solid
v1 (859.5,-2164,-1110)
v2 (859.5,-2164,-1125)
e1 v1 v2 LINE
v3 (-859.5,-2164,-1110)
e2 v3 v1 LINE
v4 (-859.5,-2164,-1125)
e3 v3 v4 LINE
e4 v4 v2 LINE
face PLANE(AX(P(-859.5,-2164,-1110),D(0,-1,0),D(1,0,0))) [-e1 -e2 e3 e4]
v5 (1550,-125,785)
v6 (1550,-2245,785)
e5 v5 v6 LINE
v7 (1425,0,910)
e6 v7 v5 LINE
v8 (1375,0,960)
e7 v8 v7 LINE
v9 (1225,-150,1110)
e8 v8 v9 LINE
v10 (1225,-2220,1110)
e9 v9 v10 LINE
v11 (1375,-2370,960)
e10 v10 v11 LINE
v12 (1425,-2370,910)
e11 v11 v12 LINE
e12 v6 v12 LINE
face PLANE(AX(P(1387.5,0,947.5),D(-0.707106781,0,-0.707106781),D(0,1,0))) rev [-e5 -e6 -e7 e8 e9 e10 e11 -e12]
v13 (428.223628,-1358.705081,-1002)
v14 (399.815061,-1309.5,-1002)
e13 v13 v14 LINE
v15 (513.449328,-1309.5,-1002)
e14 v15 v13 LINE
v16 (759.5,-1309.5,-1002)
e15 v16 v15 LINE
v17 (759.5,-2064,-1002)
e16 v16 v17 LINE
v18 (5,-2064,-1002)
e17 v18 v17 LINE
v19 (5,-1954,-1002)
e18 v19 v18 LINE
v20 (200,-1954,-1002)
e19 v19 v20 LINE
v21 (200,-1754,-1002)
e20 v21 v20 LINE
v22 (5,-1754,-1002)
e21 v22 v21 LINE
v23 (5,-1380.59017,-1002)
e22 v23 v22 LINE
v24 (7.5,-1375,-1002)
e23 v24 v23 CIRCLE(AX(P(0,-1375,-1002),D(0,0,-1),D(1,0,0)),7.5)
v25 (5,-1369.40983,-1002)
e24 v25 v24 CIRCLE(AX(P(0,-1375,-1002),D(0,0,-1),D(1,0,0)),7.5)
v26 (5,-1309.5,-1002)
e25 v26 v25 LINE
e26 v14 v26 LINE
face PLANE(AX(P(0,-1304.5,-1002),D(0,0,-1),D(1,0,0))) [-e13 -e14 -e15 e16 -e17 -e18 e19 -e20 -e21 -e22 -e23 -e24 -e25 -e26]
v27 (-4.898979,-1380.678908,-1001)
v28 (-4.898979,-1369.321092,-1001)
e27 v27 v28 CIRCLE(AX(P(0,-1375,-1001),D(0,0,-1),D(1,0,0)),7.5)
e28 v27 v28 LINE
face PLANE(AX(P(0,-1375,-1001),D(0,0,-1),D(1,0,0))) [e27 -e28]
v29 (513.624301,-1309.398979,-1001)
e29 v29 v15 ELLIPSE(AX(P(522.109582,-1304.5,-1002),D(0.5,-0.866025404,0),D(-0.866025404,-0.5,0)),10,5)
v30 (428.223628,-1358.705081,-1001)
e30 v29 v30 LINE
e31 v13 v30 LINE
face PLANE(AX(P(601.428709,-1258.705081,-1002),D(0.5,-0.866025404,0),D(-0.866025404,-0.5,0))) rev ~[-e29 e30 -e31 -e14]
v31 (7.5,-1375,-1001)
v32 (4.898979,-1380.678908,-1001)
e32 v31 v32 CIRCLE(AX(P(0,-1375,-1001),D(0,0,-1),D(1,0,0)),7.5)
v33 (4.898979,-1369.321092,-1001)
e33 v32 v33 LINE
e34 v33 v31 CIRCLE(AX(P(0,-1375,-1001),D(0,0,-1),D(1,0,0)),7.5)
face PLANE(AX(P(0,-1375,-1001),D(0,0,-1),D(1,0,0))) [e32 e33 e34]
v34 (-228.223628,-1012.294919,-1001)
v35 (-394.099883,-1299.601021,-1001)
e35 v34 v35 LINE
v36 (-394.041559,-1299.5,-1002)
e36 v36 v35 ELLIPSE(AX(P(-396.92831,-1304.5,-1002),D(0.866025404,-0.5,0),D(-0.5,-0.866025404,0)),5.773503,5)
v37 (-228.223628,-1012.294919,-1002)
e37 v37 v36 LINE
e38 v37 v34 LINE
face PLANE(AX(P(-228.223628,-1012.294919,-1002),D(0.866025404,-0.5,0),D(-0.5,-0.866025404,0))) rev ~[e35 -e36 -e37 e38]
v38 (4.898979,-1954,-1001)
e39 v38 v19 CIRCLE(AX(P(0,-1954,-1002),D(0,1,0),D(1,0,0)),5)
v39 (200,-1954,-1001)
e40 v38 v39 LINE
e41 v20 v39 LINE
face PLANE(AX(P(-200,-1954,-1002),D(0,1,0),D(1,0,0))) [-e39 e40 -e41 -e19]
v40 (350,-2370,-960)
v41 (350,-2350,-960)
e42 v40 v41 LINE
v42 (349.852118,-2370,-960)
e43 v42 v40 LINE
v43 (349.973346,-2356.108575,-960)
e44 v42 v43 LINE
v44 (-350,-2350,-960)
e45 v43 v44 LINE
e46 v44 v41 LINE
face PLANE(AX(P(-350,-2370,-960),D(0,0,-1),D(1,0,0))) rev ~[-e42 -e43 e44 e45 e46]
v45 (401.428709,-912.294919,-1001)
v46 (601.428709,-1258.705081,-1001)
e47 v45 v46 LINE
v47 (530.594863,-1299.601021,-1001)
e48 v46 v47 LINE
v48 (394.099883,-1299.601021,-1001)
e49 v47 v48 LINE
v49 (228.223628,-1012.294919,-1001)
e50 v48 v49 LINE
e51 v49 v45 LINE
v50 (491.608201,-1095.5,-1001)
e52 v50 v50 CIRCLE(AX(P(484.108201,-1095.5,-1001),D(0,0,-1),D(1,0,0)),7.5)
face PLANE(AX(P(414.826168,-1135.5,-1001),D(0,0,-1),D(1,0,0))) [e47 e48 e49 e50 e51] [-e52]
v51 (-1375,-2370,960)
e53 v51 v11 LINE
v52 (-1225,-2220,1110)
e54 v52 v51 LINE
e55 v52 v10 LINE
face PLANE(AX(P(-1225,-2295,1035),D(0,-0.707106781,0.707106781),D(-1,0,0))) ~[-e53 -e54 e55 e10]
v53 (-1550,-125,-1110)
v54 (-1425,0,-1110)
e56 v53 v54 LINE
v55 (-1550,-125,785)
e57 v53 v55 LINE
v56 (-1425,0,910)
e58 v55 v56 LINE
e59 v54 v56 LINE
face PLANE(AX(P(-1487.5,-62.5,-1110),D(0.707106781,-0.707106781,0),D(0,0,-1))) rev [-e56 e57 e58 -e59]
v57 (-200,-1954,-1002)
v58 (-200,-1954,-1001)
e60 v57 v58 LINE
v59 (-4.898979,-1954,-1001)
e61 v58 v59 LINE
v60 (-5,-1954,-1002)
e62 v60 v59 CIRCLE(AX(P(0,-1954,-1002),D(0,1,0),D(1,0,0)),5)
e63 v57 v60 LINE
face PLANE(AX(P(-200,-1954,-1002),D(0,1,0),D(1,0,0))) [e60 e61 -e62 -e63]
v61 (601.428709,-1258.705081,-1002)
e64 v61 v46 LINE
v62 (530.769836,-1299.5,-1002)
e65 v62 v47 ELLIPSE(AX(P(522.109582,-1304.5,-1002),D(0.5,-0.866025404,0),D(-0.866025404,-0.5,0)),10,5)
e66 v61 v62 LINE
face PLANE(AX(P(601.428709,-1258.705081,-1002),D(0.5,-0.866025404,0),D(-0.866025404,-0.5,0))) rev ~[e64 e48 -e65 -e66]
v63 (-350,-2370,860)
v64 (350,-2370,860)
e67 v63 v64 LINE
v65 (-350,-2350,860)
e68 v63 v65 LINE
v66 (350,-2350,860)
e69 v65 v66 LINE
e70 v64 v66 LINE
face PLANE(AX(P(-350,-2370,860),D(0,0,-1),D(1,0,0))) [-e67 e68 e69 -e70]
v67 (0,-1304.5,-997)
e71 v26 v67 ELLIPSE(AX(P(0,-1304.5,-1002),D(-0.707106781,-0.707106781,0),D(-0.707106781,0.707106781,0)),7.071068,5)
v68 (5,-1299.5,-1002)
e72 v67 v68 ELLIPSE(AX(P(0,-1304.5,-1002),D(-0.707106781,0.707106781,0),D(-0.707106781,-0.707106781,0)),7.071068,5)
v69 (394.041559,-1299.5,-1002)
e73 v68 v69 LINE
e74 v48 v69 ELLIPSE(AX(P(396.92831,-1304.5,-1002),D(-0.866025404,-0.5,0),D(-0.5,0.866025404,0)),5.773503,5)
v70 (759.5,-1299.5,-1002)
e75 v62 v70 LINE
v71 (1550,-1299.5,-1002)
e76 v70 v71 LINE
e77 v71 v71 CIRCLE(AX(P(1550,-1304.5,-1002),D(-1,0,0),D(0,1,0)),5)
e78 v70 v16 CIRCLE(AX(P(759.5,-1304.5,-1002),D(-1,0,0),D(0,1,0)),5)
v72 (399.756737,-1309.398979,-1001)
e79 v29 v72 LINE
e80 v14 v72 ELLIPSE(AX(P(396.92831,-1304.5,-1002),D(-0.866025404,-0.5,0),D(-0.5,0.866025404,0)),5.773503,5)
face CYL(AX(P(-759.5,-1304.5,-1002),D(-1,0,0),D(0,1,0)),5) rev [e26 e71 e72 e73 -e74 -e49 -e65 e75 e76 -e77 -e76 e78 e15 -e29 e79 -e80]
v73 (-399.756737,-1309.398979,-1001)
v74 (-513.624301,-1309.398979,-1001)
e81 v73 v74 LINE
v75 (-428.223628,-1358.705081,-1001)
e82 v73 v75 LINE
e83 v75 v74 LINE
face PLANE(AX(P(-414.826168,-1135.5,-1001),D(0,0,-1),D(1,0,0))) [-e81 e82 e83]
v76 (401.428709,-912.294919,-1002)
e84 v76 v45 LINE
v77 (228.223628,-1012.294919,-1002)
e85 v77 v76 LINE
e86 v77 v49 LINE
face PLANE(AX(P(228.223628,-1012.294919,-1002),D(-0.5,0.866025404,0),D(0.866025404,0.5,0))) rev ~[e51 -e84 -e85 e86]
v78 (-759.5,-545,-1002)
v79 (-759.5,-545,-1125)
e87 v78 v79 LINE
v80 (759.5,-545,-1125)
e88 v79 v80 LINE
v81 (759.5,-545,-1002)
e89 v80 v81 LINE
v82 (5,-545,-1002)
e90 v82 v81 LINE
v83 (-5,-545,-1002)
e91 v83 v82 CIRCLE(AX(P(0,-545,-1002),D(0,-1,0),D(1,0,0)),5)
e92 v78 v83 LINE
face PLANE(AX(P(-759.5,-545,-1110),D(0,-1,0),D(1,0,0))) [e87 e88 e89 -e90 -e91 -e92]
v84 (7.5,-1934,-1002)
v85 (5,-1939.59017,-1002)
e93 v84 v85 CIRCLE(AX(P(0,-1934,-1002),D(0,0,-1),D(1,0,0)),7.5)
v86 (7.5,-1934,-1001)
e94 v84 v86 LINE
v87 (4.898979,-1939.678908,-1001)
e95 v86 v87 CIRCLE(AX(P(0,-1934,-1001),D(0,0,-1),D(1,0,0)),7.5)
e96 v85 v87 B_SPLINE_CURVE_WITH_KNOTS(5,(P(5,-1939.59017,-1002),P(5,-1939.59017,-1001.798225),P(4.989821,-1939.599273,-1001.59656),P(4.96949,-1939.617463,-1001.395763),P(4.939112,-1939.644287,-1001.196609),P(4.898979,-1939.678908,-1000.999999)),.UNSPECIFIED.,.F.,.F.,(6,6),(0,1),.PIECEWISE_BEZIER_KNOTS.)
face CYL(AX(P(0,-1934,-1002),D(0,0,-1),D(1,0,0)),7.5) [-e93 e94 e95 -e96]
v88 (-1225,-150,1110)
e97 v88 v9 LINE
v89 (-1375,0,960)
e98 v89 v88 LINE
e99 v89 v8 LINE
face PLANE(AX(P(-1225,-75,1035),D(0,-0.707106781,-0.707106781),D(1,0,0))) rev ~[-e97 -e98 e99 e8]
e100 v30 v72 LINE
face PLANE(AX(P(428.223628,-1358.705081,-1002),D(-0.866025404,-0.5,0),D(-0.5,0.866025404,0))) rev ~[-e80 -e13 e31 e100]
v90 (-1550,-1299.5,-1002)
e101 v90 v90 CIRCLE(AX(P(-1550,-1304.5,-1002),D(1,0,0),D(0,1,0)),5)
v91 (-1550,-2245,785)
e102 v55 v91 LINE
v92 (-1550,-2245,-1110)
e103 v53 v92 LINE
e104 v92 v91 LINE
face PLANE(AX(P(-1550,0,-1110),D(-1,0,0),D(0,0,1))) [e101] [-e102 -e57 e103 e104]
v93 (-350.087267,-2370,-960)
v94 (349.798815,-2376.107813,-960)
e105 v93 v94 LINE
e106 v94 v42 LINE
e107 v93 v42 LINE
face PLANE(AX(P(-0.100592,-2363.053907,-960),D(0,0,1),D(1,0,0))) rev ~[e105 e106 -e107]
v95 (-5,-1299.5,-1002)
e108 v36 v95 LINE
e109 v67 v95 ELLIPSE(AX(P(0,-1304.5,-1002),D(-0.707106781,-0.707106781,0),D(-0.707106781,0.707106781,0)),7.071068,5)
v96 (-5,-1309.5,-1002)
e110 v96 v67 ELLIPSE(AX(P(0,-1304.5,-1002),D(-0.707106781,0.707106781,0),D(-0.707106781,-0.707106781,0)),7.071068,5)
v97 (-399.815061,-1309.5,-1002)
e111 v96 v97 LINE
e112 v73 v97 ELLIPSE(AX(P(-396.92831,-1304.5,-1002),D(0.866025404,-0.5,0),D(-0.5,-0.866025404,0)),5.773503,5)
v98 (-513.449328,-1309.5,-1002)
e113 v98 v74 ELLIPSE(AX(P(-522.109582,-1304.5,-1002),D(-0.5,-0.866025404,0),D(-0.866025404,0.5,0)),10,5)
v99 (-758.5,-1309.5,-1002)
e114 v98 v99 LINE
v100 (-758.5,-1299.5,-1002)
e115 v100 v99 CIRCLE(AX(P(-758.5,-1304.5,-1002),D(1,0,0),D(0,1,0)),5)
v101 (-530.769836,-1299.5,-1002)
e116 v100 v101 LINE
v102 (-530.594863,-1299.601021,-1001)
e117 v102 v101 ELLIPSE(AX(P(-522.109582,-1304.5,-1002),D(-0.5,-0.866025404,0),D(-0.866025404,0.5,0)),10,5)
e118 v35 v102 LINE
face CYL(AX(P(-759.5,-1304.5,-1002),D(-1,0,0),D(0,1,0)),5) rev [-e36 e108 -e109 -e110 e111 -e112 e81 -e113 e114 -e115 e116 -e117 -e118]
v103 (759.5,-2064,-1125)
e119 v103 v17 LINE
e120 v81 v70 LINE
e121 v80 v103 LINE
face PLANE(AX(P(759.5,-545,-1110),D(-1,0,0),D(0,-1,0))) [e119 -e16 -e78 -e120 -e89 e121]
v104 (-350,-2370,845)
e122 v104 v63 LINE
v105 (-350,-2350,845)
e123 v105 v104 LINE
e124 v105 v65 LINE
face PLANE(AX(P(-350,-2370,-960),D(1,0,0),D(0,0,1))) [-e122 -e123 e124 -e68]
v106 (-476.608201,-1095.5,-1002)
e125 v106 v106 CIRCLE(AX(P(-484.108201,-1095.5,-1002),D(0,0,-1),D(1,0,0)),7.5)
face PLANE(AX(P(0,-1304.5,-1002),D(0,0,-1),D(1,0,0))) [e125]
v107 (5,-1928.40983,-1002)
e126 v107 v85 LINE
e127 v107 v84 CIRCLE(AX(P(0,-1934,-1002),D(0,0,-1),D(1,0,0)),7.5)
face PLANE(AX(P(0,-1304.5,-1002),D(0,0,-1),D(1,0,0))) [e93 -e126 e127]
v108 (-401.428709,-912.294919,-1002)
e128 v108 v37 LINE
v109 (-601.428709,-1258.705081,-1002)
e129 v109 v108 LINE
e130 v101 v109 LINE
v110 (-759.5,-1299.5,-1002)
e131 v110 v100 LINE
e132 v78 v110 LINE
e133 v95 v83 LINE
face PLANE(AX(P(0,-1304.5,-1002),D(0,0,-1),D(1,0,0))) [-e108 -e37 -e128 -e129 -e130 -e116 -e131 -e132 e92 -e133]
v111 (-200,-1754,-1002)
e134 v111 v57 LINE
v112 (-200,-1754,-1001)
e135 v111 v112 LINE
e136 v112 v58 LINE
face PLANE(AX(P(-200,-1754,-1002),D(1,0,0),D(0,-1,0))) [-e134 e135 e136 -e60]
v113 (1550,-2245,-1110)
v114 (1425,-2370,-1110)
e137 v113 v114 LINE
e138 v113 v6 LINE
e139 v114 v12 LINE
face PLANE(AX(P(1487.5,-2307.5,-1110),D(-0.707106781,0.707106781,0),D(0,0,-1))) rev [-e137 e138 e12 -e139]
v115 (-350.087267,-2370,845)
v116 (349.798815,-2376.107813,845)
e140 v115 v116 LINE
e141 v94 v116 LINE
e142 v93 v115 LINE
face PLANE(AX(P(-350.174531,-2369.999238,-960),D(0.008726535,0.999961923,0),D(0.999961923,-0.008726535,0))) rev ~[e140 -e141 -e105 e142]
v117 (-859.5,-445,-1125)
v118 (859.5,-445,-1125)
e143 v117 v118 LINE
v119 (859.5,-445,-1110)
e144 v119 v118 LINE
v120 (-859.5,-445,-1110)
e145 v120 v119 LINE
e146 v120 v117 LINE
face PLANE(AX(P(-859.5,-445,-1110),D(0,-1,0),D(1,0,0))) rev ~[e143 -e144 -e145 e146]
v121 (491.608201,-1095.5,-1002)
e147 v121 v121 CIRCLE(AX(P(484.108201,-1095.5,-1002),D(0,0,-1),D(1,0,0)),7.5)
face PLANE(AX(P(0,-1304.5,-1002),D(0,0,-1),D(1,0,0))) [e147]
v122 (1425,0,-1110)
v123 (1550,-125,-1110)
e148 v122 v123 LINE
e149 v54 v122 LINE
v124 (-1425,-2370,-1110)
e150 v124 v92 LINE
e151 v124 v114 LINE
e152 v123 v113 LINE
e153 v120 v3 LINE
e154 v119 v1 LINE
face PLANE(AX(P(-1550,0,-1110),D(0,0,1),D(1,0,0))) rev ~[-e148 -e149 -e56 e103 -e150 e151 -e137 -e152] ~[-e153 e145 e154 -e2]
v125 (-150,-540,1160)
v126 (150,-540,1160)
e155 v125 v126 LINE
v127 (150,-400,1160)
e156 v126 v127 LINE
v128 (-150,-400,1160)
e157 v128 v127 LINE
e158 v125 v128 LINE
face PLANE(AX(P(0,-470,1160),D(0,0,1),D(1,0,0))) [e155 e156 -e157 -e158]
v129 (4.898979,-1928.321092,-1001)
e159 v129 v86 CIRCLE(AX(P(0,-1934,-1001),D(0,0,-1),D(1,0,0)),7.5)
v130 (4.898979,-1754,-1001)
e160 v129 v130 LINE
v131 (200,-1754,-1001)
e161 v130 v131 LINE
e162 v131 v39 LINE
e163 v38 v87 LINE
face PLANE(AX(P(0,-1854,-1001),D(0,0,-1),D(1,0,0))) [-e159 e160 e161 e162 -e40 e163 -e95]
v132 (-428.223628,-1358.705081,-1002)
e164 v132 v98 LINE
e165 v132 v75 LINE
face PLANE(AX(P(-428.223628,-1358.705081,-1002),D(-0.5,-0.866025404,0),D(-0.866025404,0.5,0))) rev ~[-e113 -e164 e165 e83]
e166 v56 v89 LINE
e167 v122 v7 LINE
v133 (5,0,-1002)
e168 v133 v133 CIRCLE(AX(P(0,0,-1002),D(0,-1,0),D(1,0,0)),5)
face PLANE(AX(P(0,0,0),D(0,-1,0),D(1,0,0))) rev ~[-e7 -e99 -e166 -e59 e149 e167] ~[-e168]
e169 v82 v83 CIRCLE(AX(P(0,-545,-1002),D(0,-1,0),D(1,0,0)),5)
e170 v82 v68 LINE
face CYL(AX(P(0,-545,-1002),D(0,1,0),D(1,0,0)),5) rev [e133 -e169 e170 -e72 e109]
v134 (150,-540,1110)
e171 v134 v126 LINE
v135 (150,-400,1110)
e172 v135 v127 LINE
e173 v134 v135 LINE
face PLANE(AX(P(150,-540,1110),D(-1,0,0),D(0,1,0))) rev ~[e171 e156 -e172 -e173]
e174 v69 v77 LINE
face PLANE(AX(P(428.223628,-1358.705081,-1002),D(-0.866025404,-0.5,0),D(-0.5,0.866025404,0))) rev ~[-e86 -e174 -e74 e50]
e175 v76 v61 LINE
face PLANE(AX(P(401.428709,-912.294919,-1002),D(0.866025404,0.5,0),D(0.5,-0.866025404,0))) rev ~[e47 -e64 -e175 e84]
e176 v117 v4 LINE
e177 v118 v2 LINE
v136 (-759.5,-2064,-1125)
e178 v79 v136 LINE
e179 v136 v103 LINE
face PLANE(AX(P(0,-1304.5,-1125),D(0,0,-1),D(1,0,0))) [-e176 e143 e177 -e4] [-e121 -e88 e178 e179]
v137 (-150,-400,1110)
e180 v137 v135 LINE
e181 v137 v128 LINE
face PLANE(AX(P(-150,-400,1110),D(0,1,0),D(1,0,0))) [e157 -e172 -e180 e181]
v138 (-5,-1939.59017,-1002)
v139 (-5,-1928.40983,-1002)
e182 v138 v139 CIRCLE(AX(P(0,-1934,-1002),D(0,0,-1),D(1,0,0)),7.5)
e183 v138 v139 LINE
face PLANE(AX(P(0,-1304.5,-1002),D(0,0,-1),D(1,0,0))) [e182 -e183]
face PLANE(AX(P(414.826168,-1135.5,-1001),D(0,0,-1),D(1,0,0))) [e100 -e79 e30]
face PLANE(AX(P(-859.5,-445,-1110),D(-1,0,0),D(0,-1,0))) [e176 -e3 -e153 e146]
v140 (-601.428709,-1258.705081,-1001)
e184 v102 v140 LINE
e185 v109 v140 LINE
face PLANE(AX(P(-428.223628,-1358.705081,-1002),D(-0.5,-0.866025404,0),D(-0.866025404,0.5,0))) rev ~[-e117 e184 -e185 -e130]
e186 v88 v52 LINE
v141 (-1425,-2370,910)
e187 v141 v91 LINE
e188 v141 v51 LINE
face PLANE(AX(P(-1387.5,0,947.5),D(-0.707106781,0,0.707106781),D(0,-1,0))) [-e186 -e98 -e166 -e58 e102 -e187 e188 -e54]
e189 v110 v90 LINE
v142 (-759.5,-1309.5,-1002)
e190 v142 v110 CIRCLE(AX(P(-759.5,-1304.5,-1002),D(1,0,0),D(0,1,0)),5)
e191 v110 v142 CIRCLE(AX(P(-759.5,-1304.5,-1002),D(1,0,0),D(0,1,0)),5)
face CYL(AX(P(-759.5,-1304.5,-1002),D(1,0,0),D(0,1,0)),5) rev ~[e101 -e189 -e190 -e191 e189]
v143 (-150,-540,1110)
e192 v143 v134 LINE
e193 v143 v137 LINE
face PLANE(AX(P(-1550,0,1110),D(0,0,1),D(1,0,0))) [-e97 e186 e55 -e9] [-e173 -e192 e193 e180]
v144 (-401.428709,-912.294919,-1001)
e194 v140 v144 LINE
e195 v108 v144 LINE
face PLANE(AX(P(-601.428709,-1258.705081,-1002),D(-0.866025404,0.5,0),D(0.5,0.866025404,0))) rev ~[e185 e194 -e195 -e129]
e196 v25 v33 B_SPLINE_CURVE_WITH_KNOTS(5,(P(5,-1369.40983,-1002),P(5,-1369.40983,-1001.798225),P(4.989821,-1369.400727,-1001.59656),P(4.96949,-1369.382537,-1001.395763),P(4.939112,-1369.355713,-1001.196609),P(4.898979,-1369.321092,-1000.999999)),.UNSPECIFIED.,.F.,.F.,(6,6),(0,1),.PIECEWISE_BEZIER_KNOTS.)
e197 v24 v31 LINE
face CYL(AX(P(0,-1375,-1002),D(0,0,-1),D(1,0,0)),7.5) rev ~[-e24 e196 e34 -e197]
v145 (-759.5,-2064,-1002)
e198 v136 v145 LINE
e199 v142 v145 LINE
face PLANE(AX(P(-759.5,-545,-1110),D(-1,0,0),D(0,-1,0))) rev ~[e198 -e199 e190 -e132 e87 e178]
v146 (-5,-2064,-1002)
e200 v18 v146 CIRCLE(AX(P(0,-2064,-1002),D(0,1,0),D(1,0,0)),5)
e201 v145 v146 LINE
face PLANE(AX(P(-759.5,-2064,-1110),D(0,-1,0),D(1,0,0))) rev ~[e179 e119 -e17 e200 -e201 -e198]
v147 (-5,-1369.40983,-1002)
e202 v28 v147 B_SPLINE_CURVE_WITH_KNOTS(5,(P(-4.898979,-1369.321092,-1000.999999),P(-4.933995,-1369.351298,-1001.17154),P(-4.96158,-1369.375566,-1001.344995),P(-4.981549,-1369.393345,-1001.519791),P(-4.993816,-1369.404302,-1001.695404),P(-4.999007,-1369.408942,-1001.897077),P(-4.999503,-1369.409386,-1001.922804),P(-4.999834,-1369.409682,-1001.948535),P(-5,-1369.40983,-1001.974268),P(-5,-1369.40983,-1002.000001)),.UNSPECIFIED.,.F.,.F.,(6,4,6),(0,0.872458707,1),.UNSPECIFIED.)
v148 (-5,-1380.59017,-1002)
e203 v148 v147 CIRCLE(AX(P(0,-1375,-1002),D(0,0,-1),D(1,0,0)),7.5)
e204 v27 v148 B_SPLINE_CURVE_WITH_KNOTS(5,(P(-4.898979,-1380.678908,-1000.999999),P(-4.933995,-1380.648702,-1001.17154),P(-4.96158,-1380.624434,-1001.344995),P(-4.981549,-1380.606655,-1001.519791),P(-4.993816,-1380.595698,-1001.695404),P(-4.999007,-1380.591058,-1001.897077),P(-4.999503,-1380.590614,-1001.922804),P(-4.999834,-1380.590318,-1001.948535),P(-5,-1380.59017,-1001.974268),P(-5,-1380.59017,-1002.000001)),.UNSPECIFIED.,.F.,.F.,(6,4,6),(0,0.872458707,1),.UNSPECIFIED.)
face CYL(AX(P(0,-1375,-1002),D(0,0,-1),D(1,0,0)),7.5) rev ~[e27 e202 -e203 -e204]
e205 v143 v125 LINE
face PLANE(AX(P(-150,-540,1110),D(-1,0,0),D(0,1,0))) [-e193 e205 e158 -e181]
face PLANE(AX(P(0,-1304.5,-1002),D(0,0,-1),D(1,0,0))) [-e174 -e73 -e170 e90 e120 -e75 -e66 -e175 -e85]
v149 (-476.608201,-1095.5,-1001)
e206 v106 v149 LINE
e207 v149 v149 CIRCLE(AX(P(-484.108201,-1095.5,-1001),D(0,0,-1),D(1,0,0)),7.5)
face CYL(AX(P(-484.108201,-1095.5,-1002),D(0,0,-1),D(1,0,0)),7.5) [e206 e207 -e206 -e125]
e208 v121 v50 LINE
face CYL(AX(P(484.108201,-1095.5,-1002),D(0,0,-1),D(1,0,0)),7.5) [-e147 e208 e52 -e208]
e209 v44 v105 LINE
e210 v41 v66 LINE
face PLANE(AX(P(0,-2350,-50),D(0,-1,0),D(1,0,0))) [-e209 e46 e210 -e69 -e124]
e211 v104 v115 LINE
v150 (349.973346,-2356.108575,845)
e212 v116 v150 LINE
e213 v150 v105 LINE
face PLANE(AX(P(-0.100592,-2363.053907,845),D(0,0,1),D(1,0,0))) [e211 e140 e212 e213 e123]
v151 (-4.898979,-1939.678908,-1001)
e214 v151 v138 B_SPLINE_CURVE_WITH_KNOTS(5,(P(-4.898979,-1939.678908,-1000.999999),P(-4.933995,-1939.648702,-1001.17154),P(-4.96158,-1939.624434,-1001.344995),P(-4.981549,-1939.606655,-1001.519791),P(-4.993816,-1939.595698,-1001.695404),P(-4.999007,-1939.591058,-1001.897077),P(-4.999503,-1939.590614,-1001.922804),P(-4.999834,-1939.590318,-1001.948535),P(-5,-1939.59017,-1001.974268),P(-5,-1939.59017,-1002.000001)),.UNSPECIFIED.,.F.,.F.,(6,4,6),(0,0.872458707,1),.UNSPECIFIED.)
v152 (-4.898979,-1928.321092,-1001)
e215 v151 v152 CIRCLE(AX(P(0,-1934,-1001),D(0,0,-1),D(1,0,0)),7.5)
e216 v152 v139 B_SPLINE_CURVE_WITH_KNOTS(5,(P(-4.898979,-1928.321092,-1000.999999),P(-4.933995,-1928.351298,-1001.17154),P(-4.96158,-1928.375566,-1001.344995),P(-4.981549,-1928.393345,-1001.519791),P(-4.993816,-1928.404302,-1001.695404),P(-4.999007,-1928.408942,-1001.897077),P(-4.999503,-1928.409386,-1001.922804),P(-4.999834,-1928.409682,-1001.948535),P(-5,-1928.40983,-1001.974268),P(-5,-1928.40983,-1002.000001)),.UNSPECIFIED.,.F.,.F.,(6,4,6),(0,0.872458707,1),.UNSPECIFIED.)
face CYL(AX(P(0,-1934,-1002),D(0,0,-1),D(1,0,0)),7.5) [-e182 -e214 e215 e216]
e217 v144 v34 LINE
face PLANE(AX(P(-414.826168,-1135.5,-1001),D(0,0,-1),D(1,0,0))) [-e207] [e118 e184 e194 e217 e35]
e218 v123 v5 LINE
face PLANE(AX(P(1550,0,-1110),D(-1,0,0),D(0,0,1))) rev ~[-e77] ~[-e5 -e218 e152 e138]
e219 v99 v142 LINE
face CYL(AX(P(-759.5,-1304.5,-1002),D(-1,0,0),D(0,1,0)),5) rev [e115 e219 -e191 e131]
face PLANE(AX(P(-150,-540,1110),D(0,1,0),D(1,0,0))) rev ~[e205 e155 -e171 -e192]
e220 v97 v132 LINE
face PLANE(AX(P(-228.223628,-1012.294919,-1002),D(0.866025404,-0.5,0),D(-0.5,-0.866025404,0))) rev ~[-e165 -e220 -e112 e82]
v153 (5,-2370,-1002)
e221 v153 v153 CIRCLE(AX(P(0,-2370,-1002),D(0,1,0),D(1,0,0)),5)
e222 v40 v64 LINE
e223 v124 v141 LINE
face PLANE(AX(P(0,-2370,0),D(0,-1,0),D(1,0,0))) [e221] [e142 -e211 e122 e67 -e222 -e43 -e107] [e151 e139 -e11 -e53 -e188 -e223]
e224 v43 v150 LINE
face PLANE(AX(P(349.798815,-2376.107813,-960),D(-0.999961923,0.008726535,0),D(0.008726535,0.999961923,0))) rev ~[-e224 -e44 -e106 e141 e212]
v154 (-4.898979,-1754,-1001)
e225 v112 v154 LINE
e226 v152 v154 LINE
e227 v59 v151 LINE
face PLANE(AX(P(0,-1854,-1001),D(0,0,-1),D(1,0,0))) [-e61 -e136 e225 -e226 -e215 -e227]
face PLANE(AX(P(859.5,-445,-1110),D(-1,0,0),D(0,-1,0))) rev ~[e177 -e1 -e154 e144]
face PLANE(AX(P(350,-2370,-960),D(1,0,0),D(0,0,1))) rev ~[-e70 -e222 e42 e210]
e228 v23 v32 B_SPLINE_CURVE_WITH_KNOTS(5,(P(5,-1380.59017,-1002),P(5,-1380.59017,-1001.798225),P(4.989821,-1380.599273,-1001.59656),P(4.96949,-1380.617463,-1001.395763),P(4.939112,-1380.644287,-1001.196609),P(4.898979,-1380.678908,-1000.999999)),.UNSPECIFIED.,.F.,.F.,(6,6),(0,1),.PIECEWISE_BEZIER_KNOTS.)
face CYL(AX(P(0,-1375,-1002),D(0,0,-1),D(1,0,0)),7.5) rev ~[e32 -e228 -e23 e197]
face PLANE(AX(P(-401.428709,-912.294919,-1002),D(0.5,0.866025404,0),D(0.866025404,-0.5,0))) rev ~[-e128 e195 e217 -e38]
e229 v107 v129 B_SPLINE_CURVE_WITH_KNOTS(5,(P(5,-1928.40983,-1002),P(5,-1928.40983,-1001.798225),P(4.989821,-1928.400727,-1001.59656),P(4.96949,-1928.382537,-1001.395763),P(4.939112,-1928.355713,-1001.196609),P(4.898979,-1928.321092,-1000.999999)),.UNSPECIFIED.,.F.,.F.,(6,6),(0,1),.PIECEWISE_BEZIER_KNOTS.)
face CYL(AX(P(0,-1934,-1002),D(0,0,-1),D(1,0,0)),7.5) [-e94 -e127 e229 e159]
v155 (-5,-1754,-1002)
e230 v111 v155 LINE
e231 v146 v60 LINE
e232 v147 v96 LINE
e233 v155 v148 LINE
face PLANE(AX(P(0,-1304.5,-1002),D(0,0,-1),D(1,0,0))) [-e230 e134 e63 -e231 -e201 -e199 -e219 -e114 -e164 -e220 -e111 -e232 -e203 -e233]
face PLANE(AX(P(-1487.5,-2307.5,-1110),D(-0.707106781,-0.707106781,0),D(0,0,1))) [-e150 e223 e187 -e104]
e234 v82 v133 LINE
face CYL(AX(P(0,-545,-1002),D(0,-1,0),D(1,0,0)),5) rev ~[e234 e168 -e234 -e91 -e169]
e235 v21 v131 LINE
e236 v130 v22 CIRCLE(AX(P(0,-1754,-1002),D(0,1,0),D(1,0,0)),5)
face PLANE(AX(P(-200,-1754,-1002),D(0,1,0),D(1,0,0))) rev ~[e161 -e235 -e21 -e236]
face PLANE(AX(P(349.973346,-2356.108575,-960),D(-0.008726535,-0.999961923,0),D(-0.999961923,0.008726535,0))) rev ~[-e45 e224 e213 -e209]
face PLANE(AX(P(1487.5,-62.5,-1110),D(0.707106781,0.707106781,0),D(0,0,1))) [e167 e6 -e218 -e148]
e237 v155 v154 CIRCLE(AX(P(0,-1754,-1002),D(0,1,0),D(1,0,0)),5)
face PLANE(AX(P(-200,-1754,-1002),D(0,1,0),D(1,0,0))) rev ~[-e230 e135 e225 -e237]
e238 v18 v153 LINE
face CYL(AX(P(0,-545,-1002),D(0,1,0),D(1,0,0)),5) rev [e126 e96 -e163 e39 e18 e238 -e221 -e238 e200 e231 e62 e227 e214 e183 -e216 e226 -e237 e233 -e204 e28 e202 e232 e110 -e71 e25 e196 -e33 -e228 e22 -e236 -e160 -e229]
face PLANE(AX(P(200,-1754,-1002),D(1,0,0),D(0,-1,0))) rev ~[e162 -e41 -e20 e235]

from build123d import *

# Parameters (mm, degrees)
F0_W           = 3100
F0_H           = 2220
F1_DEPTH       = 2370
F2_SIZE        = 325
F3_SIZE        = 325
F4_SIZE        = 125
F5_SIZE        = 125
F6_SIZE        = 125
F7_SIZE        = 125
F8_W           = 1519
F8_H           = 1519
F9_DEPTH       = 108
F10_W          = 400
F10_H          = 200
F10_R          = 7.5
F11_DEPTH      = 1
F12_R          = 5
F13_DEPTH      = 1
F14_DEPTH      = 790.501
F14_DEPTH_BACK = 2309.501
F15_R          = 5
F16_DEPTH      = 545.001
F16_DEPTH_BACK = 1825.001
F17_SIZE       = 150
F18_SIZE       = 150
F19_W          = 1719
F19_H          = 1719
F19_W_2        = 1519
F19_H_2        = 1519
F20_DEPTH      = 15
F21_W          = 700
F21_H          = 1820
F22_DEPTH      = 20
F23_W          = 300
F23_H          = 140
F24_DEPTH      = 50
F26_DEPTH      = 1805


# Not quite as in the source:
# - a feature of the source that left no trace in its solid (it failed there, or was rolled back) is left out


with BuildPart() as f1:
    # F0 (on Front) → F1 (new body)
    with BuildSketch(Plane.XZ):
        Rectangle(F0_W, F0_H)
    extrude(amount=F1_DEPTH)

    # F2
    f2_edges = [f1.edges().sort_by_distance(p)[0] for p in [
        (-1550, -1185, 1110),
    ]]
    chamfer(f2_edges, length=F2_SIZE)

    # F3
    f3_edges = [f1.edges().sort_by_distance(p)[0] for p in [
        (1550, -1185, 1110),
    ]]
    chamfer(f3_edges, length=F3_SIZE)

    # F4
    f4_edges = [f1.edges().sort_by_distance(p)[0] for p in [
        (1550, -2370, -162.5),
    ]]
    chamfer(f4_edges, length=F4_SIZE)

    # F5
    f5_edges = [f1.edges().sort_by_distance(p)[0] for p in [
        (-1550, -2370, -162.5),
    ]]
    chamfer(f5_edges, length=F5_SIZE)

    # F6
    f6_edges = [f1.edges().sort_by_distance(p)[0] for p in [
        (-1550, 0, -162.5),
    ]]
    chamfer(f6_edges, length=F6_SIZE)

    # F7
    f7_edges = [f1.edges().sort_by_distance(p)[0] for p in [
        (1550, 0, -162.5),
    ]]
    chamfer(f7_edges, length=F7_SIZE)

    # F8 (on face) → F9 (cut)
    with BuildSketch(Plane(origin=(0, 0, -1110), x_dir=(1, 0, 0), z_dir=(0, 0, -1))):
        with Locations((0, 1304.5)):
            Rectangle(F8_W, F8_H)
    extrude(amount=-F9_DEPTH, mode=Mode.SUBTRACT)

    # F10 (on face) → F11 (cut)
    with BuildSketch(Plane(origin=(0, 0, -1002), x_dir=(1, 0, 0), z_dir=(0, 0, -1))):
        with Locations((0, 1854)):
            Rectangle(F10_W, F10_H)
        with Locations((0, 1934)):
            Circle(F10_R, mode=Mode.SUBTRACT)
        Polygon((601.4287087912, 1258.7050807569), (428.2236280343, 1358.7050807569), (228.2236280343, 1012.2949192431), (401.4287087912, 912.2949192431), align=None)
        with Locations((484.1082007155, 1095.5)):
            Circle(F10_R, mode=Mode.SUBTRACT)
        Polygon((-228.2236280343, 1012.2949192431), (-428.2236280343, 1358.7050807569), (-601.4287087912, 1258.7050807569), (-401.4287087912, 912.2949192431), align=None)
        with Locations((-484.1082007155, 1095.5)):
            Circle(F10_R, mode=Mode.SUBTRACT)
        with Locations((0, 1375)):
            Circle(F10_R)
    extrude(amount=-F11_DEPTH, mode=Mode.SUBTRACT)

    # F12 (on face) → F13 (cut)
    with BuildSketch(Plane.YZ.offset(-759.5)):
        with Locations((-1304.5, -1002)):
            Circle(F12_R)
    extrude(amount=F13_DEPTH, mode=Mode.SUBTRACT)

    # F12 (on face) → F14 (cut, two sides)
    with BuildSketch(Plane.YZ.offset(-759.5)) as f14_sk:
        with Locations((-1304.5, -1002)):
            Circle(F12_R)
    extrude(amount=-F14_DEPTH, mode=Mode.SUBTRACT)
    extrude(f14_sk.sketch, amount=F14_DEPTH_BACK, mode=Mode.SUBTRACT)

    # F15 (on face) → F16 (cut, two sides)
    with BuildSketch(Plane.XZ.offset(545)) as f16_sk:
        with Locations((0, -1002)):
            Circle(F15_R)
    extrude(amount=-F16_DEPTH, mode=Mode.SUBTRACT)
    extrude(f16_sk.sketch, amount=F16_DEPTH_BACK, mode=Mode.SUBTRACT)

    # F17
    f17_edges = [f1.edges().sort_by_distance(p)[0] for p in [
        (0, 0, 1110),
    ]]
    chamfer(f17_edges, length=F17_SIZE)

    # F18
    f18_edges = [f1.edges().sort_by_distance(p)[0] for p in [
        (0, -2370, 1110),
    ]]
    chamfer(f18_edges, length=F18_SIZE)

    # F19 (on face) → F20 (join)
    with BuildSketch(Plane(origin=(0, 0, -1110), x_dir=(1, 0, 0), z_dir=(0, 0, -1))):
        with Locations((0, 1304.5)):
            Rectangle(F19_W, F19_H)
        with Locations((0, 1304.5)):
            Rectangle(F19_W_2, F19_H_2, mode=Mode.SUBTRACT)
    extrude(amount=F20_DEPTH)

    # F21 (on face) → F22 (cut)
    with BuildSketch(Plane.XZ.offset(2370)):
        with Locations((0, -50)):
            Rectangle(F21_W, F21_H)
    extrude(amount=-F22_DEPTH, mode=Mode.SUBTRACT)

    # F23 (on face) → F24 (join)
    with BuildSketch(Plane.XY.offset(1110)):
        with Locations((0, -470)):
            Rectangle(F23_W, F23_H)
    extrude(amount=F24_DEPTH)

    # F25 (on face) → F26 (join)
    with BuildSketch(Plane.XY.offset(-960)):
        Polygon((-350, -2350), (-350.17453071, -2369.9992384613), (349.798815435, -2376.1078133101), (349.9733461449, -2356.1085748489), align=None)
    extrude(amount=F26_DEPTH)


solid = f1.part
